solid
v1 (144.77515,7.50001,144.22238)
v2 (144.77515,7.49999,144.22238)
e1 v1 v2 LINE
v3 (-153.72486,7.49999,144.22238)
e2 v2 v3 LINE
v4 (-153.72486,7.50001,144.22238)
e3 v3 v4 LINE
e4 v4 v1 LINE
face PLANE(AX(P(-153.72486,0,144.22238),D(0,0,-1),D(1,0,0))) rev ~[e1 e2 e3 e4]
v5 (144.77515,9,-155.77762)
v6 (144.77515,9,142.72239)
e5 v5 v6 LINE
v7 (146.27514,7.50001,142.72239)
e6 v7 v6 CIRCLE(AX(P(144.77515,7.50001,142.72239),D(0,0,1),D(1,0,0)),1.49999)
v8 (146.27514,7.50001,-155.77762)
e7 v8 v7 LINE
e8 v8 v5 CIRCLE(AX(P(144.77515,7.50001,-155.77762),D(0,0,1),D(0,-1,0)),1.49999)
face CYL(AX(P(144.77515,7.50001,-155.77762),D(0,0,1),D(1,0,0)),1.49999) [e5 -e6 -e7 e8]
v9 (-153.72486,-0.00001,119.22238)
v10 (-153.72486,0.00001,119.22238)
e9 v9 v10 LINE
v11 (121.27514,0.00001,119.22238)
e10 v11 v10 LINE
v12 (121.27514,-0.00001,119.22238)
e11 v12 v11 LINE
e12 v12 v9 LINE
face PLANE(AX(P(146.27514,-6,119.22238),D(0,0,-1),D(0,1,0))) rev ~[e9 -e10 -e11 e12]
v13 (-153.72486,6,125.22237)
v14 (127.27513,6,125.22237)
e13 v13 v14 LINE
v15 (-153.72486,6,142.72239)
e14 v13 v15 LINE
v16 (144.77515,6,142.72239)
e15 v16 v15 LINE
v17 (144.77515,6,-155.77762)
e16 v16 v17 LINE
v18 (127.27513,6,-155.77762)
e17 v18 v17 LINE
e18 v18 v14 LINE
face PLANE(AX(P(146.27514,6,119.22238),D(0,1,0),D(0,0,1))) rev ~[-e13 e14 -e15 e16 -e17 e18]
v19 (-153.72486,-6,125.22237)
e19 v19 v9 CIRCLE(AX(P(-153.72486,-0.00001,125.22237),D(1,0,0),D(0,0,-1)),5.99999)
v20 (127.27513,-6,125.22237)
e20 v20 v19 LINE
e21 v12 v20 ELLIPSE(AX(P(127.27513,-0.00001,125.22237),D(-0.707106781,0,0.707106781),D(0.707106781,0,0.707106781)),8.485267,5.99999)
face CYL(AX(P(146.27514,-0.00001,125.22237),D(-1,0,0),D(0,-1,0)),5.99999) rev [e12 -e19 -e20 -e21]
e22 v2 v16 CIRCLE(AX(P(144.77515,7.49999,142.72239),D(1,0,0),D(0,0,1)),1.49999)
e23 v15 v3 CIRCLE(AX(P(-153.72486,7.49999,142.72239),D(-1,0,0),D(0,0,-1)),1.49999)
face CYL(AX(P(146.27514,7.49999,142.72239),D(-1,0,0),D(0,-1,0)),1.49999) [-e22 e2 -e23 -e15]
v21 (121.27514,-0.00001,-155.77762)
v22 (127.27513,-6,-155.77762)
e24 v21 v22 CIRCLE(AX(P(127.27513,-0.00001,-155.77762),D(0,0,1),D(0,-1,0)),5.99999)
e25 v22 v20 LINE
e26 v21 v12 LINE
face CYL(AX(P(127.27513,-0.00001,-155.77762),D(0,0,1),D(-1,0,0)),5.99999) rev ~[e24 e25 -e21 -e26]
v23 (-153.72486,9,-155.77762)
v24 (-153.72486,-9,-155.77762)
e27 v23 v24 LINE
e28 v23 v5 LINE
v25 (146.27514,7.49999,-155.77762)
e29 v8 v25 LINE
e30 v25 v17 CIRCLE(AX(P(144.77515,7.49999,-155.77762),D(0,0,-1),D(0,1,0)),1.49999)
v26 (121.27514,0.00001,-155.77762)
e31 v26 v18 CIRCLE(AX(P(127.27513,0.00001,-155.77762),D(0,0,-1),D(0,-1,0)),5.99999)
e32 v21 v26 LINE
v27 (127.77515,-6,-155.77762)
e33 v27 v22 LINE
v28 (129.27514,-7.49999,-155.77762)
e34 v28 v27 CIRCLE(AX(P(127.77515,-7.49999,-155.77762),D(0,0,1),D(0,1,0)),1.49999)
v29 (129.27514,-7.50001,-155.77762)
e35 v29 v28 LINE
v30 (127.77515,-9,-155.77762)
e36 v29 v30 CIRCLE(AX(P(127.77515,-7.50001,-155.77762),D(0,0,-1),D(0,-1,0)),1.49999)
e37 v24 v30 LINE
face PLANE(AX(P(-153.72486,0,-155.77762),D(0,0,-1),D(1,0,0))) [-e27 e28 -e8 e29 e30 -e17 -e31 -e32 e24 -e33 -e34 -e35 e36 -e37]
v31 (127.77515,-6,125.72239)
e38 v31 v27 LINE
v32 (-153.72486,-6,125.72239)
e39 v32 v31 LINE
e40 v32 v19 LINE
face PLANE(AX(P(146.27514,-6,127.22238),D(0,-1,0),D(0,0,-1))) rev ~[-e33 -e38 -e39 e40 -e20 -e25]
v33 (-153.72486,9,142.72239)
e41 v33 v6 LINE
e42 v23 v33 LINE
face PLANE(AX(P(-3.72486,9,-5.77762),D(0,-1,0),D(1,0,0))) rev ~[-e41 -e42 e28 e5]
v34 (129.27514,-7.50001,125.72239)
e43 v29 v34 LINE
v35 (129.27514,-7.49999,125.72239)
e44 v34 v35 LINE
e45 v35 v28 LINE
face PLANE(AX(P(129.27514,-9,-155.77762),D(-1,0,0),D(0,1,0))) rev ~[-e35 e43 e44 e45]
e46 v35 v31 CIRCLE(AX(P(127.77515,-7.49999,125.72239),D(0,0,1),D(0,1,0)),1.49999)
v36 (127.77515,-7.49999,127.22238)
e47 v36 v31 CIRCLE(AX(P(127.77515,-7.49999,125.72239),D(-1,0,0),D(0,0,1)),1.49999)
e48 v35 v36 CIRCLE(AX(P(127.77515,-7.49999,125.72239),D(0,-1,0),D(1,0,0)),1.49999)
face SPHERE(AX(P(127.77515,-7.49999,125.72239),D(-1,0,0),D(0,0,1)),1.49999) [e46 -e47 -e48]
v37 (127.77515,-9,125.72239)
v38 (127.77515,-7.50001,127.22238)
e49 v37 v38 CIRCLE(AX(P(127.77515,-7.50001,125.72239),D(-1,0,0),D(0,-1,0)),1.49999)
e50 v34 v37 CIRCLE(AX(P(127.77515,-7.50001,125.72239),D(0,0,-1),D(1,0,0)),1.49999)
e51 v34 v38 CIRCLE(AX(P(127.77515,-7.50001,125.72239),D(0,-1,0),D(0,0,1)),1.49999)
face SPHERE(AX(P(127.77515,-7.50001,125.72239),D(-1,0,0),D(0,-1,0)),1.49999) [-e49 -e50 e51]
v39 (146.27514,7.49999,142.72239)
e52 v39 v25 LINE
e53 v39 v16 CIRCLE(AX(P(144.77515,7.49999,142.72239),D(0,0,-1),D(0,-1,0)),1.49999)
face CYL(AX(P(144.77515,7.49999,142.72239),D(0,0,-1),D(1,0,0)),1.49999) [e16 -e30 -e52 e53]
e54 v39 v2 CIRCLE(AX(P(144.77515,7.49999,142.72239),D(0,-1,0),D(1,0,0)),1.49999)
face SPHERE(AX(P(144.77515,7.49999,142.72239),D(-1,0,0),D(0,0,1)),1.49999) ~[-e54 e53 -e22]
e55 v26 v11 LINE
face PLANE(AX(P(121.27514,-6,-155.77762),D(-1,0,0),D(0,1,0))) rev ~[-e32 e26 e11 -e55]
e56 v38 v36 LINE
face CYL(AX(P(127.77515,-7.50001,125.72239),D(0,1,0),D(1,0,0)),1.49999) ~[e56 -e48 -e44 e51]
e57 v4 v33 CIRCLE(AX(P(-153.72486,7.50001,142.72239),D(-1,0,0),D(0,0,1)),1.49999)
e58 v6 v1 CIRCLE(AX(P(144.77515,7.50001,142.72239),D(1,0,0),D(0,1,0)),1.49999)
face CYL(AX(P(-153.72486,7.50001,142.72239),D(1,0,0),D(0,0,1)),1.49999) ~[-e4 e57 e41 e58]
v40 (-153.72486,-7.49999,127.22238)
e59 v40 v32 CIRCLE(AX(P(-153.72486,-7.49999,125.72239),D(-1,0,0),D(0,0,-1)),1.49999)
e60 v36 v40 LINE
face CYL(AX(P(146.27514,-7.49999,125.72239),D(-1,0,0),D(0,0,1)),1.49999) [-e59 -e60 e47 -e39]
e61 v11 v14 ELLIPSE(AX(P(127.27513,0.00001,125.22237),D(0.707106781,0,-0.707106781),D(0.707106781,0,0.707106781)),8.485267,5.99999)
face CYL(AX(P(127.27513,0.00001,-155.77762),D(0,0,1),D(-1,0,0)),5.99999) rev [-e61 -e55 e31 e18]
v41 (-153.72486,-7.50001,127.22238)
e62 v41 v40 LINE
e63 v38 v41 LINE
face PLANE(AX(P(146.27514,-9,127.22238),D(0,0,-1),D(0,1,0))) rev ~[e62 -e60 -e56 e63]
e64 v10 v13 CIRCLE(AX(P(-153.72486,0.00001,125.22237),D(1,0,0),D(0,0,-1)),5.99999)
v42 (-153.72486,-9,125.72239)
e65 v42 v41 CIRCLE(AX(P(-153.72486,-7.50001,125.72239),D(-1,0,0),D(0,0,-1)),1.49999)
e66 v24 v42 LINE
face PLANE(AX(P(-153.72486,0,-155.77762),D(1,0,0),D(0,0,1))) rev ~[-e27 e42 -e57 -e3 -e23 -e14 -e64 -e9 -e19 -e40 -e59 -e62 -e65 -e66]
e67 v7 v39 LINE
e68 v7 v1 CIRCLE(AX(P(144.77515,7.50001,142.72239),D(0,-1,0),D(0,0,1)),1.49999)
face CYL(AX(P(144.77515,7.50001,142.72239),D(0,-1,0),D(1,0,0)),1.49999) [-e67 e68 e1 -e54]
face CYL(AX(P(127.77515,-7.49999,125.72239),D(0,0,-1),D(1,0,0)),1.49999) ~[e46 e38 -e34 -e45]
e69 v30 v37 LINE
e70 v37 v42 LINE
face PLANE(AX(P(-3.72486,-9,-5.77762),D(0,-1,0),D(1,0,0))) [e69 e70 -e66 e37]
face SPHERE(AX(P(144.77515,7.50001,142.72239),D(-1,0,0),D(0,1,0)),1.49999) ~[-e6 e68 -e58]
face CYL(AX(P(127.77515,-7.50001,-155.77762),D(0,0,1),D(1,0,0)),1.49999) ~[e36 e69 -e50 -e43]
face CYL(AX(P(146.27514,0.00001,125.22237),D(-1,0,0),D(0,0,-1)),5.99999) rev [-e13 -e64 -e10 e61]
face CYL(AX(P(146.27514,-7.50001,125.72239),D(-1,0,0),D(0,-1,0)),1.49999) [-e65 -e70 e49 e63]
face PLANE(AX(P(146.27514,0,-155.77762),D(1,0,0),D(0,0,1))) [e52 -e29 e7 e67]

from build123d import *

# Parameters (mm, degrees)
F0_W     = 300
F0_H     = 300
F1_DEPTH = 9
F3_DEPTH = 300.001
F4_R     = 1.49999
F5_R     = 5.99999
F7_DEPTH = 300.001
F8_R     = 5.99999
F9_R     = 1.49999


# Not quite as in the source:
# - a fillet or chamfer is up to 0.001 mm smaller than in the source, because OpenCascade refuses the exact size


with BuildPart() as f1:
    # F0 (on Front) → F1 (new body, symmetric)
    with BuildSketch(Plane.XZ):
        with Locations((-3.7248600274, -5.7776198197)):
            Rectangle(F0_W, F0_H)
    extrude(amount=F1_DEPTH, both=True)

    # F2 (on face) → F3 (cut, through all)
    with BuildSketch(Plane.YZ.offset(146.2751399726)):
        Polygon((6, 144.2223801803), (-9, 144.2223801803), (-9, 127.2223801803), (-6, 127.2223801803), (-6, 119.2223801803), (6, 119.2223801803), align=None)
    extrude(amount=-F3_DEPTH, mode=Mode.SUBTRACT)

    # F4 (radius 1.5 in the source; OpenCascade refuses exactly that, so slightly less here)
    f4_edges = [f1.edges().sort_by_distance(p)[0] for p in [
        (-3.72486, 6, 144.22238),
        (-3.72486, 9, 144.22238),
        (-3.72486, -9, 127.22238),
        (-3.72486, -6, 127.22238),
    ]]
    fillet(f4_edges, radius=F4_R)

    # F5 (radius 6 in the source; OpenCascade refuses exactly that, so slightly less here)
    f5_edges = [f1.edges().sort_by_distance(p)[0] for p in [
        (-3.72486, 6, 119.22238),
        (-3.72486, -6, 119.22238),
    ]]
    fillet(f5_edges, radius=F5_R)

    # F6 (on face) → F7 (cut, through all)
    with BuildSketch(Plane(origin=(0, 0, -155.7776198197), x_dir=(1, 0, 0), z_dir=(0, 0, -1))):
        Polygon((146.2751399726, -6), (146.2751399726, 9), (129.2751399726, 9), (129.2751399726, 6), (121.2751399726, 6), (121.2751399726, -6), align=None)
    extrude(amount=-F7_DEPTH, mode=Mode.SUBTRACT)

    # F8 (radius 6 in the source; OpenCascade refuses exactly that, so slightly less here)
    f8_edges = [f1.edges().sort_by_distance(p)[0] for p in [
        (121.27514, 6, -15.277625),
        (121.27514, -6, -15.277625),
    ]]
    fillet(f8_edges, radius=F8_R)

    # F9 (radius 1.5 in the source; OpenCascade refuses exactly that, so slightly less here)
    f9_edges = [f1.edges().sort_by_distance(p)[0] for p in [
        (129.27514, -6, -15.027615),
        (146.27514, 9, -6.527615),
    ]]
    fillet(f9_edges, radius=F9_R)


solid = f1.part
